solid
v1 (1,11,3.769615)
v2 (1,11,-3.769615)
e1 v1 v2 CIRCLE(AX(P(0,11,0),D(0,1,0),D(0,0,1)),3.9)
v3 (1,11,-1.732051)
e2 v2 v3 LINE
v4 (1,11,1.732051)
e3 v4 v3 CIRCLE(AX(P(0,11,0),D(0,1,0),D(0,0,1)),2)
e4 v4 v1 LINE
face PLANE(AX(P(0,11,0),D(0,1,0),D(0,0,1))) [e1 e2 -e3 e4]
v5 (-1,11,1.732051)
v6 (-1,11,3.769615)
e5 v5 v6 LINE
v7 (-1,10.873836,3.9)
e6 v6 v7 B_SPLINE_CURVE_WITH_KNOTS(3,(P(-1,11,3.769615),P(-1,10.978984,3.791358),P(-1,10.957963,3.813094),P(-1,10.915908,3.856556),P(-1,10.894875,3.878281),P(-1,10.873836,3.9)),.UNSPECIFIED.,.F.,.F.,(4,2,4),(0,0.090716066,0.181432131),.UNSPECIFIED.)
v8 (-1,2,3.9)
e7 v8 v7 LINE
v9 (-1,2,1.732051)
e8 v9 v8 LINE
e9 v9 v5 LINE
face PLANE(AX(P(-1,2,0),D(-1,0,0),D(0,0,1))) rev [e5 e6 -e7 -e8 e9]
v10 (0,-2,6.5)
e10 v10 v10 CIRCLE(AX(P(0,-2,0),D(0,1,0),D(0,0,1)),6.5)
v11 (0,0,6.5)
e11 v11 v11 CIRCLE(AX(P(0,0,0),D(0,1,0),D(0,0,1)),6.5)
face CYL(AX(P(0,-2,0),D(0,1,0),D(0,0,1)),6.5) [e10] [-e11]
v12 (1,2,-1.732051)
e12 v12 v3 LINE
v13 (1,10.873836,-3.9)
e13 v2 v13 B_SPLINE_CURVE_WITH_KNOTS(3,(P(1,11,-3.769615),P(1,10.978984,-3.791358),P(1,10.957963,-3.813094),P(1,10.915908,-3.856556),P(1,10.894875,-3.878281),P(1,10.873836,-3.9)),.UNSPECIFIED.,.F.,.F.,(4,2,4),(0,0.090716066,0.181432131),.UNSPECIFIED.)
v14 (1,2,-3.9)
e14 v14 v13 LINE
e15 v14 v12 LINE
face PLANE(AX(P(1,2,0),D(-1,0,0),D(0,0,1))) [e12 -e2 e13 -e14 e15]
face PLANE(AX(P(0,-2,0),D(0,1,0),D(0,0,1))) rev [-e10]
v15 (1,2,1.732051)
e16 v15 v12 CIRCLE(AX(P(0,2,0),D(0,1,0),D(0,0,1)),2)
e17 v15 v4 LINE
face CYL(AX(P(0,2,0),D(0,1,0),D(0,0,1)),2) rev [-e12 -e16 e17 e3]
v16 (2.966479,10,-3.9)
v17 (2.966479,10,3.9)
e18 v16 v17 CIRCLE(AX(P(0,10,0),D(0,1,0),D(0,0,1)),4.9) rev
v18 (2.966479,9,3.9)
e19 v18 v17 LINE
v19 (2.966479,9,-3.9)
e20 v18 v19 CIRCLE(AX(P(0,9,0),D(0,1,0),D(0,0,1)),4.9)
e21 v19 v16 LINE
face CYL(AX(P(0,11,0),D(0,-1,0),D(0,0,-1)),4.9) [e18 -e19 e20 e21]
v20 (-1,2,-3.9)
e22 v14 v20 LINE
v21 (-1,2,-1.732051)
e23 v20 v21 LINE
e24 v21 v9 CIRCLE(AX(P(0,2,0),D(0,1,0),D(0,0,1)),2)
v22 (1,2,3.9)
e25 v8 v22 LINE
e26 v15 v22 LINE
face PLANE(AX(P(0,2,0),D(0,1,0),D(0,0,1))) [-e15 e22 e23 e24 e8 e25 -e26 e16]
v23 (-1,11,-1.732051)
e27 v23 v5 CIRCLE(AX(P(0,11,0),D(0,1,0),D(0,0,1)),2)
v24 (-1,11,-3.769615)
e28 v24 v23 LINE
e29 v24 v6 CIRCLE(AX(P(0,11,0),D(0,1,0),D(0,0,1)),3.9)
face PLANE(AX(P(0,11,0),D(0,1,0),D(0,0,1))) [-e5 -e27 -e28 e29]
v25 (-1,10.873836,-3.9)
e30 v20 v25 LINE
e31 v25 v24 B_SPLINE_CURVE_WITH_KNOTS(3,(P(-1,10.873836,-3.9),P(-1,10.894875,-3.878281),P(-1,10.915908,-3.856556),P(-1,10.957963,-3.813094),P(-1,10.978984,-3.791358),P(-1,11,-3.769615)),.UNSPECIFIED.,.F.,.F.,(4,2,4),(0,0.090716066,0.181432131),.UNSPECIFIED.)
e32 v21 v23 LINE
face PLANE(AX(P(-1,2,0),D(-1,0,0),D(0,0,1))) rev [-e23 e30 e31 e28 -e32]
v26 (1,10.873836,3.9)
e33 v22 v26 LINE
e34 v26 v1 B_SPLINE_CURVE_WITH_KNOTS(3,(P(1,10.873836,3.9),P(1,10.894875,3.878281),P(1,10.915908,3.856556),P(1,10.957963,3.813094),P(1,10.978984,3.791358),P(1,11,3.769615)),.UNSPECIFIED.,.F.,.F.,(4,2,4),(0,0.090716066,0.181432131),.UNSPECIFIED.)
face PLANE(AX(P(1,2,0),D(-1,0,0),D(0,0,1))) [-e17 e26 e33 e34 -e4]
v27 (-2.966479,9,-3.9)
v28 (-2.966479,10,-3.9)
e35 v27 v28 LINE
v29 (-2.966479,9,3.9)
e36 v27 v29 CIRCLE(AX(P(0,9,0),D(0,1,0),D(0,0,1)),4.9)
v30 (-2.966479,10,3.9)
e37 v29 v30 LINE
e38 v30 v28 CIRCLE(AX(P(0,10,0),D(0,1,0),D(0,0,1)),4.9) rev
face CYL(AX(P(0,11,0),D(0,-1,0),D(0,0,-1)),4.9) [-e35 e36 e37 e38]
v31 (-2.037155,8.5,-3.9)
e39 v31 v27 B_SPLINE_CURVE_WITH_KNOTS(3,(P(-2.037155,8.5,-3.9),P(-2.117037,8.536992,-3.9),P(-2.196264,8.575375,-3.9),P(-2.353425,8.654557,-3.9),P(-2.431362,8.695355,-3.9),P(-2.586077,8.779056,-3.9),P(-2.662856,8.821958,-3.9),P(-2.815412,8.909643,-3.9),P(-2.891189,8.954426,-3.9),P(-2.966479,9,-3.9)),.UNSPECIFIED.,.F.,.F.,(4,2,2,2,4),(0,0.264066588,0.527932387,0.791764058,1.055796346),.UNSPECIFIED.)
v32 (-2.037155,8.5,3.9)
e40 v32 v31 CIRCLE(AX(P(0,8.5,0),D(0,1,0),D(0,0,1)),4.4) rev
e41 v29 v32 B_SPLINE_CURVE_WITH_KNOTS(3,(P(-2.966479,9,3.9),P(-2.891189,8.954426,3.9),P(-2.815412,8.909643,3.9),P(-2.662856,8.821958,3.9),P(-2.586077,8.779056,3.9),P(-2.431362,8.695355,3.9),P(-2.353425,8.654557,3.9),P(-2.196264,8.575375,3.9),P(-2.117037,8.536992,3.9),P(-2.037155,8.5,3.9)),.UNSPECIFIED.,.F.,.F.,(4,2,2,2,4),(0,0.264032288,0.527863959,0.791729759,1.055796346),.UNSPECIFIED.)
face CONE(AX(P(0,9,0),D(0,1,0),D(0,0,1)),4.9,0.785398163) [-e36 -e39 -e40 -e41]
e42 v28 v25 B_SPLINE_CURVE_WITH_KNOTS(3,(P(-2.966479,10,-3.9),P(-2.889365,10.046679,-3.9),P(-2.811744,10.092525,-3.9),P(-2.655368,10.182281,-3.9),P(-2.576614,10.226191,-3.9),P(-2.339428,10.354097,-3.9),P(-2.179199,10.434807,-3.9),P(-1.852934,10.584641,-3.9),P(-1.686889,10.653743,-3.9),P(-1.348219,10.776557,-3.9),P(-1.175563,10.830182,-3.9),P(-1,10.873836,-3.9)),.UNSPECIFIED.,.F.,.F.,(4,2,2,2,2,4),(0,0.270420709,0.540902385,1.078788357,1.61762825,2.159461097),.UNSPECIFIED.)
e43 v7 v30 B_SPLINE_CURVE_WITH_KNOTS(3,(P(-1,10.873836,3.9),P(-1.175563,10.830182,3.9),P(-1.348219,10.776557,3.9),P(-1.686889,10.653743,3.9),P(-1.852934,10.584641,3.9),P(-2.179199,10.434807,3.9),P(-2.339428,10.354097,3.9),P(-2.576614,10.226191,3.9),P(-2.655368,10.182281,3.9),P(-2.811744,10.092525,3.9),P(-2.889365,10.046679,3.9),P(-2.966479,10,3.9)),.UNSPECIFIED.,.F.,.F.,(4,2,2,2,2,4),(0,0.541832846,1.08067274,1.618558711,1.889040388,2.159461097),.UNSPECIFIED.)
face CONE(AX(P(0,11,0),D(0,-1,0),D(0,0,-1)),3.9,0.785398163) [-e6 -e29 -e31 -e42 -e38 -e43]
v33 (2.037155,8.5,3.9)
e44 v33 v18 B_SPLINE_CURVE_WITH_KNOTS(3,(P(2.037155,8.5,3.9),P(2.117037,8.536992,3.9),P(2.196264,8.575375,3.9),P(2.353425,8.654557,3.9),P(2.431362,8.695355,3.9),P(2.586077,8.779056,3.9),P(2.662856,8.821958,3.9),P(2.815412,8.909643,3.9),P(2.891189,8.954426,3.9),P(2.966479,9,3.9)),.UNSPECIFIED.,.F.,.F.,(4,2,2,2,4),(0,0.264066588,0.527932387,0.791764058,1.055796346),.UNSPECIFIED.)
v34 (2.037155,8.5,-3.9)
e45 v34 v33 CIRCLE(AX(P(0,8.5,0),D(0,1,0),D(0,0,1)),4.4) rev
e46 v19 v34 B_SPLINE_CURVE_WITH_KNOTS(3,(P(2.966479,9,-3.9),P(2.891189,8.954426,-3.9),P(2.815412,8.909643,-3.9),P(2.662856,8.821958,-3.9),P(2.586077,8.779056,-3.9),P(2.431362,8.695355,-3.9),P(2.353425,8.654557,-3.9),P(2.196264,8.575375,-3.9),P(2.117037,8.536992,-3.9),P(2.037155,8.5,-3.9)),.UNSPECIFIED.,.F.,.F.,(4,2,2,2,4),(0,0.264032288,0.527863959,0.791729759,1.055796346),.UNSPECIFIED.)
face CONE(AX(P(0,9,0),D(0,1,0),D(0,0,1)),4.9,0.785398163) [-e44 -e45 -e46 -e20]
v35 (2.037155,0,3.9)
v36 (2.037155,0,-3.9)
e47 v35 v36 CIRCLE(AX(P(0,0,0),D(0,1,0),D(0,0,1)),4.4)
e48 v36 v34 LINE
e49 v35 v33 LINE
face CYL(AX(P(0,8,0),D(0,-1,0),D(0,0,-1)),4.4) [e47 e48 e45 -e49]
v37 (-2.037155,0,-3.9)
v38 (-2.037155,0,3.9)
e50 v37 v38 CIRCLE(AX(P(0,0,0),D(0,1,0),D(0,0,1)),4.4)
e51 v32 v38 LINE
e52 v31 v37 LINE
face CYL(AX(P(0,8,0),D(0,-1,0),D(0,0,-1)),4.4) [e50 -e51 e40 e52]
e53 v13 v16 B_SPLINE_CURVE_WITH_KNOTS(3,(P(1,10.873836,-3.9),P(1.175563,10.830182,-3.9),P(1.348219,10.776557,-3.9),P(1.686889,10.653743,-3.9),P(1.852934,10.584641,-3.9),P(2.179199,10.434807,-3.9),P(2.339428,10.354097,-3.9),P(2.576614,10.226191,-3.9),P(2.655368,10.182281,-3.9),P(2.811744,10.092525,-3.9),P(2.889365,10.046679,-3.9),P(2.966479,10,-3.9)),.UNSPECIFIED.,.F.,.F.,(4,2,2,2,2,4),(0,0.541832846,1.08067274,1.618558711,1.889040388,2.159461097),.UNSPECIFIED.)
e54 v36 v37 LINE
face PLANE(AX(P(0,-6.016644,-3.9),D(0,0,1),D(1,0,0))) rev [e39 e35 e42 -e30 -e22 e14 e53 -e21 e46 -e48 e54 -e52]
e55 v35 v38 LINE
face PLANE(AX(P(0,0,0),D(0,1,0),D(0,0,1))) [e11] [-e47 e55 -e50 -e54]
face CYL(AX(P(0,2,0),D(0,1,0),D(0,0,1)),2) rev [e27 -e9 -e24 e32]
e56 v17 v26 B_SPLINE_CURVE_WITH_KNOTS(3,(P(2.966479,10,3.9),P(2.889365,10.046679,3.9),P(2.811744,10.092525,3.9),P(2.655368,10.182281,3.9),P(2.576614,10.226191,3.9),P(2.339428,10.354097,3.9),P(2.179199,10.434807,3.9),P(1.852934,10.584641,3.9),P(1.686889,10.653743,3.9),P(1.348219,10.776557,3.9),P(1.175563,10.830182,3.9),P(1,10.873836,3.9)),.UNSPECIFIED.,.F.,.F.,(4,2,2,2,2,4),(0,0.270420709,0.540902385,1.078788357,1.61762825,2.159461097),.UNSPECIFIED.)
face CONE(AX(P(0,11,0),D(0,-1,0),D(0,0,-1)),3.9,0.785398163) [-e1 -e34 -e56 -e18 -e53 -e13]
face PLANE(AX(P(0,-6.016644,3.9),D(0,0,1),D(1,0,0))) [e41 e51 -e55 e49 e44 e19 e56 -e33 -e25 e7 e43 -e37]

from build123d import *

# Parameters (mm, degrees)
ESBO_O1_R                = 6.5
RESSALTO_EXTRUS_O1_DEPTH = 2
ESBO_O2_R                = 4.4
RESSALTO_EXTRUS_O2_DEPTH = 8
ESBO_O3_R                = 4.9
RESSALTO_EXTRUS_O3_DEPTH = 3
CORTE_EXTRUS_O1_REACH    = 17.922
CORTE_EXTRUS_O2_DEPTH    = 9
CHANFRO1_SIZE            = 1


with BuildPart() as part:
    # Esboço1 → Ressalto-extrusão1 (new body)
    with BuildSketch(Plane(origin=(0, 0, 0), x_dir=(1, 0, 0), z_dir=(0, 1, 0))):
        with Locations(Location((0, 0, 0), (0, 0, 270))):
            Circle(ESBO_O1_R)
    extrude(amount=-RESSALTO_EXTRUS_O1_DEPTH)

    # Esboço2 → Ressalto-extrusão2 (add)
    with BuildSketch(Plane(origin=(0, 0, 0), x_dir=(1, 0, 0), z_dir=(0, 1, 0))):
        with Locations(Location((0, 0, 0), (0, 0, 270))):
            Circle(ESBO_O2_R)
    extrude(amount=RESSALTO_EXTRUS_O2_DEPTH)

    # Esboço3 → Ressalto-extrusão3 (add)
    with BuildSketch(Plane(origin=(0, 8, 0), x_dir=(1, 0, 0), z_dir=(0, 1, 0))):
        with Locations(Location((0, 0, 0), (0, 0, 270))):
            Circle(ESBO_O3_R)
    extrude(amount=RESSALTO_EXTRUS_O3_DEPTH)

    # Corte-extrusão1: up to this face of the body (flat: up to its plane)
    corte_extrus_o1_end = Plane(part.part.faces().sort_by_distance((0, 0, -6.316152237))[0])
    # Esboço4 → Corte-extrusão1 (cut, up to the picked face)
    with BuildSketch(Plane(origin=(0, 11, 0), x_dir=(1, 0, 0), z_dir=(0, 1, 0)), mode=Mode.PRIVATE) as corte_extrus_o1_sk1:
        with BuildLine():
            Line((2.966479395, -3.9), (-2.966479395, -3.9))
            ThreePointArc((-2.966479395, -3.9), (0, -4.9), (2.966479395, -3.9))
        make_face()
    corte_extrus_o1_tool1 = split(extrude(corte_extrus_o1_sk1.sketch, amount=-CORTE_EXTRUS_O1_REACH, mode=Mode.PRIVATE), bisect_by=corte_extrus_o1_end, keep=Keep.BOTH, mode=Mode.PRIVATE)
    # Esboço4 → Corte-extrusão1 (cut, up to the picked face)
    with BuildSketch(Plane(origin=(0, 11, 0), x_dir=(1, 0, 0), z_dir=(0, 1, 0)), mode=Mode.PRIVATE) as corte_extrus_o1_sk2:
        with BuildLine():
            ThreePointArc((2.966479395, 3.9), (0, 4.9), (-2.966479395, 3.9))
            Line((-2.966479395, 3.9), (2.966479395, 3.9))
        make_face()
    corte_extrus_o1_tool2 = split(extrude(corte_extrus_o1_sk2.sketch, amount=-CORTE_EXTRUS_O1_REACH, mode=Mode.PRIVATE), bisect_by=corte_extrus_o1_end, keep=Keep.BOTH, mode=Mode.PRIVATE)
    add(corte_extrus_o1_tool1.solids().sort_by(Axis((0, 11, 4.303719), (0, -1, 0)))[0], mode=Mode.SUBTRACT)
    add(corte_extrus_o1_tool2.solids().sort_by(Axis((0, 11, -4.303719), (0, -1, 0)))[0], mode=Mode.SUBTRACT)

    # Esboço5 → Corte-extrusão2 (cut)
    with BuildSketch(Plane(origin=(0, 11, 0), x_dir=(1, 0, 0), z_dir=(0, 1, 0))):
        with BuildLine():
            Line((0, 2), (0, 3.9))
            Line((0, 3.9), (-1, 3.9))
            Line((-1, 3.9), (-1, 1.732050808))
            ThreePointArc((-1, 1.732050808), (-0.51763809, 1.931851653), (0, 2))
        make_face()
        with BuildLine():
            Line((1, 3.9), (0, 3.9))
            Line((0, 3.9), (0, 2))
            ThreePointArc((0, 2), (0.51763809, 1.931851653), (1, 1.732050808))
            Line((1, 1.732050808), (1, 3.9))
        make_face()
        with BuildLine():
            Line((0, -3.9), (0, -2))
            ThreePointArc((0, -2), (-0.51763809, -1.931851653), (-1, -1.732050808))
            Line((-1, -1.732050808), (-1, -3.9))
            Line((-1, -3.9), (0, -3.9))
        make_face()
        with BuildLine():
            ThreePointArc((1, -1.732050808), (0.51763809, -1.931851653), (0, -2))
            Line((0, -2), (0, -3.9))
            Line((0, -3.9), (1, -3.9))
            Line((1, -3.9), (1, -1.732050808))
        make_face()
        with BuildLine():
            Line((0, -2), (0, 2))
            ThreePointArc((0, 2), (-0.51763809, 1.931851653), (-1, 1.732050808))
            Line((-1, 1.732050808), (-1, -1.732050808))
            ThreePointArc((-1, -1.732050808), (-0.51763809, -1.931851653), (0, -2))
        make_face()
        with BuildLine():
            ThreePointArc((1, 1.732050808), (0.51763809, 1.931851653), (0, 2))
            Line((0, 2), (0, -2))
            ThreePointArc((0, -2), (0.51763809, -1.931851653), (1, -1.732050808))
            Line((1, -1.732050808), (1, 1.732050808))
        make_face()
        with BuildLine():
            Line((-1, -1.732050808), (-1, 1.732050808))
            ThreePointArc((-1, 1.732050808), (-2, 0), (-1, -1.732050808))
        make_face()
        with BuildLine():
            ThreePointArc((2, 0), (1.732050808, 1), (1, 1.732050808))
            Line((1, 1.732050808), (1, -1.732050808))
            ThreePointArc((1, -1.732050808), (1.732050808, -1), (2, 0))
        make_face()
    extrude(amount=-CORTE_EXTRUS_O2_DEPTH, mode=Mode.SUBTRACT)

    # Chanfro1
    # the kernel refuses this chamfer: 1 mm, written as the material it takes off along each edge
    with BuildSketch(Plane(origin=(0, 8, 0), x_dir=(0.12482395655997021, 0, 0.9921789051722048), z_dir=(-0.9921789051722048, 0, 0.12482395655997021))) as chanfro1_piece_1_section:
        Polygon((4.9, CHANFRO1_SIZE), (4.9 - CHANFRO1_SIZE, 0), (4.9, 0), align=None)
    chanfro1_piece_1 = revolve(axis=Axis((0, 8, 0), (0, 1, 0)), revolution_arc=165.658820776, mode=Mode.PRIVATE)
    chanfro1_piece_1 = chanfro1_piece_1 - Plane(origin=(0, 8.751624074, 0), x_dir=(0, 0, 1), z_dir=(0, -1, 0)) * Cylinder(4.4, 20, mode=Mode.PRIVATE)
    add(chanfro1_piece_1, mode=Mode.SUBTRACT)
    with BuildSketch(Plane(origin=(0, 8, 0), x_dir=(-0.12482395656001569, 0, -0.9921789051721989), z_dir=(0.9921789051721989, 0, -0.12482395656001569))) as chanfro1_piece_2_section:
        Polygon((4.9 - CHANFRO1_SIZE, 0), (4.9, CHANFRO1_SIZE), (4.9, 0), align=None)
    chanfro1_piece_2 = revolve(axis=Axis((0, 8, 0), (0, 1, 0)), revolution_arc=165.658820776, mode=Mode.PRIVATE)
    chanfro1_piece_2 = chanfro1_piece_2 - Plane(origin=(0, 8.751624074, 0), x_dir=(0, 0, 1), z_dir=(0, -1, 0)) * Cylinder(4.4, 20, mode=Mode.PRIVATE)
    add(chanfro1_piece_2, mode=Mode.SUBTRACT)
    with BuildSketch(Plane(origin=(0, 11, 0), x_dir=(-0.124823956560002, 0, -0.9921789051722005), z_dir=(0.9921789051722005, 0, -0.124823956560002))) as chanfro1_piece_3:
        Polygon((4.9 - CHANFRO1_SIZE, 0), (4.9, -CHANFRO1_SIZE), (4.9, 0), align=None)
    revolve(axis=Axis((0, 11, 0), (0, 1, 0)), revolution_arc=165.658820776, mode=Mode.SUBTRACT)
    with BuildSketch(Plane(origin=(0, 11, 0), x_dir=(0.12482395656000247, 0, 0.9921789051722005), z_dir=(-0.9921789051722005, 0, 0.12482395656000247))) as chanfro1_piece_4:
        Polygon((4.9, -CHANFRO1_SIZE), (4.9 - CHANFRO1_SIZE, 0), (4.9, 0), align=None)
    revolve(axis=Axis((0, 11, 0), (0, 1, 0)), revolution_arc=165.658820776, mode=Mode.SUBTRACT)


solid = part.part
